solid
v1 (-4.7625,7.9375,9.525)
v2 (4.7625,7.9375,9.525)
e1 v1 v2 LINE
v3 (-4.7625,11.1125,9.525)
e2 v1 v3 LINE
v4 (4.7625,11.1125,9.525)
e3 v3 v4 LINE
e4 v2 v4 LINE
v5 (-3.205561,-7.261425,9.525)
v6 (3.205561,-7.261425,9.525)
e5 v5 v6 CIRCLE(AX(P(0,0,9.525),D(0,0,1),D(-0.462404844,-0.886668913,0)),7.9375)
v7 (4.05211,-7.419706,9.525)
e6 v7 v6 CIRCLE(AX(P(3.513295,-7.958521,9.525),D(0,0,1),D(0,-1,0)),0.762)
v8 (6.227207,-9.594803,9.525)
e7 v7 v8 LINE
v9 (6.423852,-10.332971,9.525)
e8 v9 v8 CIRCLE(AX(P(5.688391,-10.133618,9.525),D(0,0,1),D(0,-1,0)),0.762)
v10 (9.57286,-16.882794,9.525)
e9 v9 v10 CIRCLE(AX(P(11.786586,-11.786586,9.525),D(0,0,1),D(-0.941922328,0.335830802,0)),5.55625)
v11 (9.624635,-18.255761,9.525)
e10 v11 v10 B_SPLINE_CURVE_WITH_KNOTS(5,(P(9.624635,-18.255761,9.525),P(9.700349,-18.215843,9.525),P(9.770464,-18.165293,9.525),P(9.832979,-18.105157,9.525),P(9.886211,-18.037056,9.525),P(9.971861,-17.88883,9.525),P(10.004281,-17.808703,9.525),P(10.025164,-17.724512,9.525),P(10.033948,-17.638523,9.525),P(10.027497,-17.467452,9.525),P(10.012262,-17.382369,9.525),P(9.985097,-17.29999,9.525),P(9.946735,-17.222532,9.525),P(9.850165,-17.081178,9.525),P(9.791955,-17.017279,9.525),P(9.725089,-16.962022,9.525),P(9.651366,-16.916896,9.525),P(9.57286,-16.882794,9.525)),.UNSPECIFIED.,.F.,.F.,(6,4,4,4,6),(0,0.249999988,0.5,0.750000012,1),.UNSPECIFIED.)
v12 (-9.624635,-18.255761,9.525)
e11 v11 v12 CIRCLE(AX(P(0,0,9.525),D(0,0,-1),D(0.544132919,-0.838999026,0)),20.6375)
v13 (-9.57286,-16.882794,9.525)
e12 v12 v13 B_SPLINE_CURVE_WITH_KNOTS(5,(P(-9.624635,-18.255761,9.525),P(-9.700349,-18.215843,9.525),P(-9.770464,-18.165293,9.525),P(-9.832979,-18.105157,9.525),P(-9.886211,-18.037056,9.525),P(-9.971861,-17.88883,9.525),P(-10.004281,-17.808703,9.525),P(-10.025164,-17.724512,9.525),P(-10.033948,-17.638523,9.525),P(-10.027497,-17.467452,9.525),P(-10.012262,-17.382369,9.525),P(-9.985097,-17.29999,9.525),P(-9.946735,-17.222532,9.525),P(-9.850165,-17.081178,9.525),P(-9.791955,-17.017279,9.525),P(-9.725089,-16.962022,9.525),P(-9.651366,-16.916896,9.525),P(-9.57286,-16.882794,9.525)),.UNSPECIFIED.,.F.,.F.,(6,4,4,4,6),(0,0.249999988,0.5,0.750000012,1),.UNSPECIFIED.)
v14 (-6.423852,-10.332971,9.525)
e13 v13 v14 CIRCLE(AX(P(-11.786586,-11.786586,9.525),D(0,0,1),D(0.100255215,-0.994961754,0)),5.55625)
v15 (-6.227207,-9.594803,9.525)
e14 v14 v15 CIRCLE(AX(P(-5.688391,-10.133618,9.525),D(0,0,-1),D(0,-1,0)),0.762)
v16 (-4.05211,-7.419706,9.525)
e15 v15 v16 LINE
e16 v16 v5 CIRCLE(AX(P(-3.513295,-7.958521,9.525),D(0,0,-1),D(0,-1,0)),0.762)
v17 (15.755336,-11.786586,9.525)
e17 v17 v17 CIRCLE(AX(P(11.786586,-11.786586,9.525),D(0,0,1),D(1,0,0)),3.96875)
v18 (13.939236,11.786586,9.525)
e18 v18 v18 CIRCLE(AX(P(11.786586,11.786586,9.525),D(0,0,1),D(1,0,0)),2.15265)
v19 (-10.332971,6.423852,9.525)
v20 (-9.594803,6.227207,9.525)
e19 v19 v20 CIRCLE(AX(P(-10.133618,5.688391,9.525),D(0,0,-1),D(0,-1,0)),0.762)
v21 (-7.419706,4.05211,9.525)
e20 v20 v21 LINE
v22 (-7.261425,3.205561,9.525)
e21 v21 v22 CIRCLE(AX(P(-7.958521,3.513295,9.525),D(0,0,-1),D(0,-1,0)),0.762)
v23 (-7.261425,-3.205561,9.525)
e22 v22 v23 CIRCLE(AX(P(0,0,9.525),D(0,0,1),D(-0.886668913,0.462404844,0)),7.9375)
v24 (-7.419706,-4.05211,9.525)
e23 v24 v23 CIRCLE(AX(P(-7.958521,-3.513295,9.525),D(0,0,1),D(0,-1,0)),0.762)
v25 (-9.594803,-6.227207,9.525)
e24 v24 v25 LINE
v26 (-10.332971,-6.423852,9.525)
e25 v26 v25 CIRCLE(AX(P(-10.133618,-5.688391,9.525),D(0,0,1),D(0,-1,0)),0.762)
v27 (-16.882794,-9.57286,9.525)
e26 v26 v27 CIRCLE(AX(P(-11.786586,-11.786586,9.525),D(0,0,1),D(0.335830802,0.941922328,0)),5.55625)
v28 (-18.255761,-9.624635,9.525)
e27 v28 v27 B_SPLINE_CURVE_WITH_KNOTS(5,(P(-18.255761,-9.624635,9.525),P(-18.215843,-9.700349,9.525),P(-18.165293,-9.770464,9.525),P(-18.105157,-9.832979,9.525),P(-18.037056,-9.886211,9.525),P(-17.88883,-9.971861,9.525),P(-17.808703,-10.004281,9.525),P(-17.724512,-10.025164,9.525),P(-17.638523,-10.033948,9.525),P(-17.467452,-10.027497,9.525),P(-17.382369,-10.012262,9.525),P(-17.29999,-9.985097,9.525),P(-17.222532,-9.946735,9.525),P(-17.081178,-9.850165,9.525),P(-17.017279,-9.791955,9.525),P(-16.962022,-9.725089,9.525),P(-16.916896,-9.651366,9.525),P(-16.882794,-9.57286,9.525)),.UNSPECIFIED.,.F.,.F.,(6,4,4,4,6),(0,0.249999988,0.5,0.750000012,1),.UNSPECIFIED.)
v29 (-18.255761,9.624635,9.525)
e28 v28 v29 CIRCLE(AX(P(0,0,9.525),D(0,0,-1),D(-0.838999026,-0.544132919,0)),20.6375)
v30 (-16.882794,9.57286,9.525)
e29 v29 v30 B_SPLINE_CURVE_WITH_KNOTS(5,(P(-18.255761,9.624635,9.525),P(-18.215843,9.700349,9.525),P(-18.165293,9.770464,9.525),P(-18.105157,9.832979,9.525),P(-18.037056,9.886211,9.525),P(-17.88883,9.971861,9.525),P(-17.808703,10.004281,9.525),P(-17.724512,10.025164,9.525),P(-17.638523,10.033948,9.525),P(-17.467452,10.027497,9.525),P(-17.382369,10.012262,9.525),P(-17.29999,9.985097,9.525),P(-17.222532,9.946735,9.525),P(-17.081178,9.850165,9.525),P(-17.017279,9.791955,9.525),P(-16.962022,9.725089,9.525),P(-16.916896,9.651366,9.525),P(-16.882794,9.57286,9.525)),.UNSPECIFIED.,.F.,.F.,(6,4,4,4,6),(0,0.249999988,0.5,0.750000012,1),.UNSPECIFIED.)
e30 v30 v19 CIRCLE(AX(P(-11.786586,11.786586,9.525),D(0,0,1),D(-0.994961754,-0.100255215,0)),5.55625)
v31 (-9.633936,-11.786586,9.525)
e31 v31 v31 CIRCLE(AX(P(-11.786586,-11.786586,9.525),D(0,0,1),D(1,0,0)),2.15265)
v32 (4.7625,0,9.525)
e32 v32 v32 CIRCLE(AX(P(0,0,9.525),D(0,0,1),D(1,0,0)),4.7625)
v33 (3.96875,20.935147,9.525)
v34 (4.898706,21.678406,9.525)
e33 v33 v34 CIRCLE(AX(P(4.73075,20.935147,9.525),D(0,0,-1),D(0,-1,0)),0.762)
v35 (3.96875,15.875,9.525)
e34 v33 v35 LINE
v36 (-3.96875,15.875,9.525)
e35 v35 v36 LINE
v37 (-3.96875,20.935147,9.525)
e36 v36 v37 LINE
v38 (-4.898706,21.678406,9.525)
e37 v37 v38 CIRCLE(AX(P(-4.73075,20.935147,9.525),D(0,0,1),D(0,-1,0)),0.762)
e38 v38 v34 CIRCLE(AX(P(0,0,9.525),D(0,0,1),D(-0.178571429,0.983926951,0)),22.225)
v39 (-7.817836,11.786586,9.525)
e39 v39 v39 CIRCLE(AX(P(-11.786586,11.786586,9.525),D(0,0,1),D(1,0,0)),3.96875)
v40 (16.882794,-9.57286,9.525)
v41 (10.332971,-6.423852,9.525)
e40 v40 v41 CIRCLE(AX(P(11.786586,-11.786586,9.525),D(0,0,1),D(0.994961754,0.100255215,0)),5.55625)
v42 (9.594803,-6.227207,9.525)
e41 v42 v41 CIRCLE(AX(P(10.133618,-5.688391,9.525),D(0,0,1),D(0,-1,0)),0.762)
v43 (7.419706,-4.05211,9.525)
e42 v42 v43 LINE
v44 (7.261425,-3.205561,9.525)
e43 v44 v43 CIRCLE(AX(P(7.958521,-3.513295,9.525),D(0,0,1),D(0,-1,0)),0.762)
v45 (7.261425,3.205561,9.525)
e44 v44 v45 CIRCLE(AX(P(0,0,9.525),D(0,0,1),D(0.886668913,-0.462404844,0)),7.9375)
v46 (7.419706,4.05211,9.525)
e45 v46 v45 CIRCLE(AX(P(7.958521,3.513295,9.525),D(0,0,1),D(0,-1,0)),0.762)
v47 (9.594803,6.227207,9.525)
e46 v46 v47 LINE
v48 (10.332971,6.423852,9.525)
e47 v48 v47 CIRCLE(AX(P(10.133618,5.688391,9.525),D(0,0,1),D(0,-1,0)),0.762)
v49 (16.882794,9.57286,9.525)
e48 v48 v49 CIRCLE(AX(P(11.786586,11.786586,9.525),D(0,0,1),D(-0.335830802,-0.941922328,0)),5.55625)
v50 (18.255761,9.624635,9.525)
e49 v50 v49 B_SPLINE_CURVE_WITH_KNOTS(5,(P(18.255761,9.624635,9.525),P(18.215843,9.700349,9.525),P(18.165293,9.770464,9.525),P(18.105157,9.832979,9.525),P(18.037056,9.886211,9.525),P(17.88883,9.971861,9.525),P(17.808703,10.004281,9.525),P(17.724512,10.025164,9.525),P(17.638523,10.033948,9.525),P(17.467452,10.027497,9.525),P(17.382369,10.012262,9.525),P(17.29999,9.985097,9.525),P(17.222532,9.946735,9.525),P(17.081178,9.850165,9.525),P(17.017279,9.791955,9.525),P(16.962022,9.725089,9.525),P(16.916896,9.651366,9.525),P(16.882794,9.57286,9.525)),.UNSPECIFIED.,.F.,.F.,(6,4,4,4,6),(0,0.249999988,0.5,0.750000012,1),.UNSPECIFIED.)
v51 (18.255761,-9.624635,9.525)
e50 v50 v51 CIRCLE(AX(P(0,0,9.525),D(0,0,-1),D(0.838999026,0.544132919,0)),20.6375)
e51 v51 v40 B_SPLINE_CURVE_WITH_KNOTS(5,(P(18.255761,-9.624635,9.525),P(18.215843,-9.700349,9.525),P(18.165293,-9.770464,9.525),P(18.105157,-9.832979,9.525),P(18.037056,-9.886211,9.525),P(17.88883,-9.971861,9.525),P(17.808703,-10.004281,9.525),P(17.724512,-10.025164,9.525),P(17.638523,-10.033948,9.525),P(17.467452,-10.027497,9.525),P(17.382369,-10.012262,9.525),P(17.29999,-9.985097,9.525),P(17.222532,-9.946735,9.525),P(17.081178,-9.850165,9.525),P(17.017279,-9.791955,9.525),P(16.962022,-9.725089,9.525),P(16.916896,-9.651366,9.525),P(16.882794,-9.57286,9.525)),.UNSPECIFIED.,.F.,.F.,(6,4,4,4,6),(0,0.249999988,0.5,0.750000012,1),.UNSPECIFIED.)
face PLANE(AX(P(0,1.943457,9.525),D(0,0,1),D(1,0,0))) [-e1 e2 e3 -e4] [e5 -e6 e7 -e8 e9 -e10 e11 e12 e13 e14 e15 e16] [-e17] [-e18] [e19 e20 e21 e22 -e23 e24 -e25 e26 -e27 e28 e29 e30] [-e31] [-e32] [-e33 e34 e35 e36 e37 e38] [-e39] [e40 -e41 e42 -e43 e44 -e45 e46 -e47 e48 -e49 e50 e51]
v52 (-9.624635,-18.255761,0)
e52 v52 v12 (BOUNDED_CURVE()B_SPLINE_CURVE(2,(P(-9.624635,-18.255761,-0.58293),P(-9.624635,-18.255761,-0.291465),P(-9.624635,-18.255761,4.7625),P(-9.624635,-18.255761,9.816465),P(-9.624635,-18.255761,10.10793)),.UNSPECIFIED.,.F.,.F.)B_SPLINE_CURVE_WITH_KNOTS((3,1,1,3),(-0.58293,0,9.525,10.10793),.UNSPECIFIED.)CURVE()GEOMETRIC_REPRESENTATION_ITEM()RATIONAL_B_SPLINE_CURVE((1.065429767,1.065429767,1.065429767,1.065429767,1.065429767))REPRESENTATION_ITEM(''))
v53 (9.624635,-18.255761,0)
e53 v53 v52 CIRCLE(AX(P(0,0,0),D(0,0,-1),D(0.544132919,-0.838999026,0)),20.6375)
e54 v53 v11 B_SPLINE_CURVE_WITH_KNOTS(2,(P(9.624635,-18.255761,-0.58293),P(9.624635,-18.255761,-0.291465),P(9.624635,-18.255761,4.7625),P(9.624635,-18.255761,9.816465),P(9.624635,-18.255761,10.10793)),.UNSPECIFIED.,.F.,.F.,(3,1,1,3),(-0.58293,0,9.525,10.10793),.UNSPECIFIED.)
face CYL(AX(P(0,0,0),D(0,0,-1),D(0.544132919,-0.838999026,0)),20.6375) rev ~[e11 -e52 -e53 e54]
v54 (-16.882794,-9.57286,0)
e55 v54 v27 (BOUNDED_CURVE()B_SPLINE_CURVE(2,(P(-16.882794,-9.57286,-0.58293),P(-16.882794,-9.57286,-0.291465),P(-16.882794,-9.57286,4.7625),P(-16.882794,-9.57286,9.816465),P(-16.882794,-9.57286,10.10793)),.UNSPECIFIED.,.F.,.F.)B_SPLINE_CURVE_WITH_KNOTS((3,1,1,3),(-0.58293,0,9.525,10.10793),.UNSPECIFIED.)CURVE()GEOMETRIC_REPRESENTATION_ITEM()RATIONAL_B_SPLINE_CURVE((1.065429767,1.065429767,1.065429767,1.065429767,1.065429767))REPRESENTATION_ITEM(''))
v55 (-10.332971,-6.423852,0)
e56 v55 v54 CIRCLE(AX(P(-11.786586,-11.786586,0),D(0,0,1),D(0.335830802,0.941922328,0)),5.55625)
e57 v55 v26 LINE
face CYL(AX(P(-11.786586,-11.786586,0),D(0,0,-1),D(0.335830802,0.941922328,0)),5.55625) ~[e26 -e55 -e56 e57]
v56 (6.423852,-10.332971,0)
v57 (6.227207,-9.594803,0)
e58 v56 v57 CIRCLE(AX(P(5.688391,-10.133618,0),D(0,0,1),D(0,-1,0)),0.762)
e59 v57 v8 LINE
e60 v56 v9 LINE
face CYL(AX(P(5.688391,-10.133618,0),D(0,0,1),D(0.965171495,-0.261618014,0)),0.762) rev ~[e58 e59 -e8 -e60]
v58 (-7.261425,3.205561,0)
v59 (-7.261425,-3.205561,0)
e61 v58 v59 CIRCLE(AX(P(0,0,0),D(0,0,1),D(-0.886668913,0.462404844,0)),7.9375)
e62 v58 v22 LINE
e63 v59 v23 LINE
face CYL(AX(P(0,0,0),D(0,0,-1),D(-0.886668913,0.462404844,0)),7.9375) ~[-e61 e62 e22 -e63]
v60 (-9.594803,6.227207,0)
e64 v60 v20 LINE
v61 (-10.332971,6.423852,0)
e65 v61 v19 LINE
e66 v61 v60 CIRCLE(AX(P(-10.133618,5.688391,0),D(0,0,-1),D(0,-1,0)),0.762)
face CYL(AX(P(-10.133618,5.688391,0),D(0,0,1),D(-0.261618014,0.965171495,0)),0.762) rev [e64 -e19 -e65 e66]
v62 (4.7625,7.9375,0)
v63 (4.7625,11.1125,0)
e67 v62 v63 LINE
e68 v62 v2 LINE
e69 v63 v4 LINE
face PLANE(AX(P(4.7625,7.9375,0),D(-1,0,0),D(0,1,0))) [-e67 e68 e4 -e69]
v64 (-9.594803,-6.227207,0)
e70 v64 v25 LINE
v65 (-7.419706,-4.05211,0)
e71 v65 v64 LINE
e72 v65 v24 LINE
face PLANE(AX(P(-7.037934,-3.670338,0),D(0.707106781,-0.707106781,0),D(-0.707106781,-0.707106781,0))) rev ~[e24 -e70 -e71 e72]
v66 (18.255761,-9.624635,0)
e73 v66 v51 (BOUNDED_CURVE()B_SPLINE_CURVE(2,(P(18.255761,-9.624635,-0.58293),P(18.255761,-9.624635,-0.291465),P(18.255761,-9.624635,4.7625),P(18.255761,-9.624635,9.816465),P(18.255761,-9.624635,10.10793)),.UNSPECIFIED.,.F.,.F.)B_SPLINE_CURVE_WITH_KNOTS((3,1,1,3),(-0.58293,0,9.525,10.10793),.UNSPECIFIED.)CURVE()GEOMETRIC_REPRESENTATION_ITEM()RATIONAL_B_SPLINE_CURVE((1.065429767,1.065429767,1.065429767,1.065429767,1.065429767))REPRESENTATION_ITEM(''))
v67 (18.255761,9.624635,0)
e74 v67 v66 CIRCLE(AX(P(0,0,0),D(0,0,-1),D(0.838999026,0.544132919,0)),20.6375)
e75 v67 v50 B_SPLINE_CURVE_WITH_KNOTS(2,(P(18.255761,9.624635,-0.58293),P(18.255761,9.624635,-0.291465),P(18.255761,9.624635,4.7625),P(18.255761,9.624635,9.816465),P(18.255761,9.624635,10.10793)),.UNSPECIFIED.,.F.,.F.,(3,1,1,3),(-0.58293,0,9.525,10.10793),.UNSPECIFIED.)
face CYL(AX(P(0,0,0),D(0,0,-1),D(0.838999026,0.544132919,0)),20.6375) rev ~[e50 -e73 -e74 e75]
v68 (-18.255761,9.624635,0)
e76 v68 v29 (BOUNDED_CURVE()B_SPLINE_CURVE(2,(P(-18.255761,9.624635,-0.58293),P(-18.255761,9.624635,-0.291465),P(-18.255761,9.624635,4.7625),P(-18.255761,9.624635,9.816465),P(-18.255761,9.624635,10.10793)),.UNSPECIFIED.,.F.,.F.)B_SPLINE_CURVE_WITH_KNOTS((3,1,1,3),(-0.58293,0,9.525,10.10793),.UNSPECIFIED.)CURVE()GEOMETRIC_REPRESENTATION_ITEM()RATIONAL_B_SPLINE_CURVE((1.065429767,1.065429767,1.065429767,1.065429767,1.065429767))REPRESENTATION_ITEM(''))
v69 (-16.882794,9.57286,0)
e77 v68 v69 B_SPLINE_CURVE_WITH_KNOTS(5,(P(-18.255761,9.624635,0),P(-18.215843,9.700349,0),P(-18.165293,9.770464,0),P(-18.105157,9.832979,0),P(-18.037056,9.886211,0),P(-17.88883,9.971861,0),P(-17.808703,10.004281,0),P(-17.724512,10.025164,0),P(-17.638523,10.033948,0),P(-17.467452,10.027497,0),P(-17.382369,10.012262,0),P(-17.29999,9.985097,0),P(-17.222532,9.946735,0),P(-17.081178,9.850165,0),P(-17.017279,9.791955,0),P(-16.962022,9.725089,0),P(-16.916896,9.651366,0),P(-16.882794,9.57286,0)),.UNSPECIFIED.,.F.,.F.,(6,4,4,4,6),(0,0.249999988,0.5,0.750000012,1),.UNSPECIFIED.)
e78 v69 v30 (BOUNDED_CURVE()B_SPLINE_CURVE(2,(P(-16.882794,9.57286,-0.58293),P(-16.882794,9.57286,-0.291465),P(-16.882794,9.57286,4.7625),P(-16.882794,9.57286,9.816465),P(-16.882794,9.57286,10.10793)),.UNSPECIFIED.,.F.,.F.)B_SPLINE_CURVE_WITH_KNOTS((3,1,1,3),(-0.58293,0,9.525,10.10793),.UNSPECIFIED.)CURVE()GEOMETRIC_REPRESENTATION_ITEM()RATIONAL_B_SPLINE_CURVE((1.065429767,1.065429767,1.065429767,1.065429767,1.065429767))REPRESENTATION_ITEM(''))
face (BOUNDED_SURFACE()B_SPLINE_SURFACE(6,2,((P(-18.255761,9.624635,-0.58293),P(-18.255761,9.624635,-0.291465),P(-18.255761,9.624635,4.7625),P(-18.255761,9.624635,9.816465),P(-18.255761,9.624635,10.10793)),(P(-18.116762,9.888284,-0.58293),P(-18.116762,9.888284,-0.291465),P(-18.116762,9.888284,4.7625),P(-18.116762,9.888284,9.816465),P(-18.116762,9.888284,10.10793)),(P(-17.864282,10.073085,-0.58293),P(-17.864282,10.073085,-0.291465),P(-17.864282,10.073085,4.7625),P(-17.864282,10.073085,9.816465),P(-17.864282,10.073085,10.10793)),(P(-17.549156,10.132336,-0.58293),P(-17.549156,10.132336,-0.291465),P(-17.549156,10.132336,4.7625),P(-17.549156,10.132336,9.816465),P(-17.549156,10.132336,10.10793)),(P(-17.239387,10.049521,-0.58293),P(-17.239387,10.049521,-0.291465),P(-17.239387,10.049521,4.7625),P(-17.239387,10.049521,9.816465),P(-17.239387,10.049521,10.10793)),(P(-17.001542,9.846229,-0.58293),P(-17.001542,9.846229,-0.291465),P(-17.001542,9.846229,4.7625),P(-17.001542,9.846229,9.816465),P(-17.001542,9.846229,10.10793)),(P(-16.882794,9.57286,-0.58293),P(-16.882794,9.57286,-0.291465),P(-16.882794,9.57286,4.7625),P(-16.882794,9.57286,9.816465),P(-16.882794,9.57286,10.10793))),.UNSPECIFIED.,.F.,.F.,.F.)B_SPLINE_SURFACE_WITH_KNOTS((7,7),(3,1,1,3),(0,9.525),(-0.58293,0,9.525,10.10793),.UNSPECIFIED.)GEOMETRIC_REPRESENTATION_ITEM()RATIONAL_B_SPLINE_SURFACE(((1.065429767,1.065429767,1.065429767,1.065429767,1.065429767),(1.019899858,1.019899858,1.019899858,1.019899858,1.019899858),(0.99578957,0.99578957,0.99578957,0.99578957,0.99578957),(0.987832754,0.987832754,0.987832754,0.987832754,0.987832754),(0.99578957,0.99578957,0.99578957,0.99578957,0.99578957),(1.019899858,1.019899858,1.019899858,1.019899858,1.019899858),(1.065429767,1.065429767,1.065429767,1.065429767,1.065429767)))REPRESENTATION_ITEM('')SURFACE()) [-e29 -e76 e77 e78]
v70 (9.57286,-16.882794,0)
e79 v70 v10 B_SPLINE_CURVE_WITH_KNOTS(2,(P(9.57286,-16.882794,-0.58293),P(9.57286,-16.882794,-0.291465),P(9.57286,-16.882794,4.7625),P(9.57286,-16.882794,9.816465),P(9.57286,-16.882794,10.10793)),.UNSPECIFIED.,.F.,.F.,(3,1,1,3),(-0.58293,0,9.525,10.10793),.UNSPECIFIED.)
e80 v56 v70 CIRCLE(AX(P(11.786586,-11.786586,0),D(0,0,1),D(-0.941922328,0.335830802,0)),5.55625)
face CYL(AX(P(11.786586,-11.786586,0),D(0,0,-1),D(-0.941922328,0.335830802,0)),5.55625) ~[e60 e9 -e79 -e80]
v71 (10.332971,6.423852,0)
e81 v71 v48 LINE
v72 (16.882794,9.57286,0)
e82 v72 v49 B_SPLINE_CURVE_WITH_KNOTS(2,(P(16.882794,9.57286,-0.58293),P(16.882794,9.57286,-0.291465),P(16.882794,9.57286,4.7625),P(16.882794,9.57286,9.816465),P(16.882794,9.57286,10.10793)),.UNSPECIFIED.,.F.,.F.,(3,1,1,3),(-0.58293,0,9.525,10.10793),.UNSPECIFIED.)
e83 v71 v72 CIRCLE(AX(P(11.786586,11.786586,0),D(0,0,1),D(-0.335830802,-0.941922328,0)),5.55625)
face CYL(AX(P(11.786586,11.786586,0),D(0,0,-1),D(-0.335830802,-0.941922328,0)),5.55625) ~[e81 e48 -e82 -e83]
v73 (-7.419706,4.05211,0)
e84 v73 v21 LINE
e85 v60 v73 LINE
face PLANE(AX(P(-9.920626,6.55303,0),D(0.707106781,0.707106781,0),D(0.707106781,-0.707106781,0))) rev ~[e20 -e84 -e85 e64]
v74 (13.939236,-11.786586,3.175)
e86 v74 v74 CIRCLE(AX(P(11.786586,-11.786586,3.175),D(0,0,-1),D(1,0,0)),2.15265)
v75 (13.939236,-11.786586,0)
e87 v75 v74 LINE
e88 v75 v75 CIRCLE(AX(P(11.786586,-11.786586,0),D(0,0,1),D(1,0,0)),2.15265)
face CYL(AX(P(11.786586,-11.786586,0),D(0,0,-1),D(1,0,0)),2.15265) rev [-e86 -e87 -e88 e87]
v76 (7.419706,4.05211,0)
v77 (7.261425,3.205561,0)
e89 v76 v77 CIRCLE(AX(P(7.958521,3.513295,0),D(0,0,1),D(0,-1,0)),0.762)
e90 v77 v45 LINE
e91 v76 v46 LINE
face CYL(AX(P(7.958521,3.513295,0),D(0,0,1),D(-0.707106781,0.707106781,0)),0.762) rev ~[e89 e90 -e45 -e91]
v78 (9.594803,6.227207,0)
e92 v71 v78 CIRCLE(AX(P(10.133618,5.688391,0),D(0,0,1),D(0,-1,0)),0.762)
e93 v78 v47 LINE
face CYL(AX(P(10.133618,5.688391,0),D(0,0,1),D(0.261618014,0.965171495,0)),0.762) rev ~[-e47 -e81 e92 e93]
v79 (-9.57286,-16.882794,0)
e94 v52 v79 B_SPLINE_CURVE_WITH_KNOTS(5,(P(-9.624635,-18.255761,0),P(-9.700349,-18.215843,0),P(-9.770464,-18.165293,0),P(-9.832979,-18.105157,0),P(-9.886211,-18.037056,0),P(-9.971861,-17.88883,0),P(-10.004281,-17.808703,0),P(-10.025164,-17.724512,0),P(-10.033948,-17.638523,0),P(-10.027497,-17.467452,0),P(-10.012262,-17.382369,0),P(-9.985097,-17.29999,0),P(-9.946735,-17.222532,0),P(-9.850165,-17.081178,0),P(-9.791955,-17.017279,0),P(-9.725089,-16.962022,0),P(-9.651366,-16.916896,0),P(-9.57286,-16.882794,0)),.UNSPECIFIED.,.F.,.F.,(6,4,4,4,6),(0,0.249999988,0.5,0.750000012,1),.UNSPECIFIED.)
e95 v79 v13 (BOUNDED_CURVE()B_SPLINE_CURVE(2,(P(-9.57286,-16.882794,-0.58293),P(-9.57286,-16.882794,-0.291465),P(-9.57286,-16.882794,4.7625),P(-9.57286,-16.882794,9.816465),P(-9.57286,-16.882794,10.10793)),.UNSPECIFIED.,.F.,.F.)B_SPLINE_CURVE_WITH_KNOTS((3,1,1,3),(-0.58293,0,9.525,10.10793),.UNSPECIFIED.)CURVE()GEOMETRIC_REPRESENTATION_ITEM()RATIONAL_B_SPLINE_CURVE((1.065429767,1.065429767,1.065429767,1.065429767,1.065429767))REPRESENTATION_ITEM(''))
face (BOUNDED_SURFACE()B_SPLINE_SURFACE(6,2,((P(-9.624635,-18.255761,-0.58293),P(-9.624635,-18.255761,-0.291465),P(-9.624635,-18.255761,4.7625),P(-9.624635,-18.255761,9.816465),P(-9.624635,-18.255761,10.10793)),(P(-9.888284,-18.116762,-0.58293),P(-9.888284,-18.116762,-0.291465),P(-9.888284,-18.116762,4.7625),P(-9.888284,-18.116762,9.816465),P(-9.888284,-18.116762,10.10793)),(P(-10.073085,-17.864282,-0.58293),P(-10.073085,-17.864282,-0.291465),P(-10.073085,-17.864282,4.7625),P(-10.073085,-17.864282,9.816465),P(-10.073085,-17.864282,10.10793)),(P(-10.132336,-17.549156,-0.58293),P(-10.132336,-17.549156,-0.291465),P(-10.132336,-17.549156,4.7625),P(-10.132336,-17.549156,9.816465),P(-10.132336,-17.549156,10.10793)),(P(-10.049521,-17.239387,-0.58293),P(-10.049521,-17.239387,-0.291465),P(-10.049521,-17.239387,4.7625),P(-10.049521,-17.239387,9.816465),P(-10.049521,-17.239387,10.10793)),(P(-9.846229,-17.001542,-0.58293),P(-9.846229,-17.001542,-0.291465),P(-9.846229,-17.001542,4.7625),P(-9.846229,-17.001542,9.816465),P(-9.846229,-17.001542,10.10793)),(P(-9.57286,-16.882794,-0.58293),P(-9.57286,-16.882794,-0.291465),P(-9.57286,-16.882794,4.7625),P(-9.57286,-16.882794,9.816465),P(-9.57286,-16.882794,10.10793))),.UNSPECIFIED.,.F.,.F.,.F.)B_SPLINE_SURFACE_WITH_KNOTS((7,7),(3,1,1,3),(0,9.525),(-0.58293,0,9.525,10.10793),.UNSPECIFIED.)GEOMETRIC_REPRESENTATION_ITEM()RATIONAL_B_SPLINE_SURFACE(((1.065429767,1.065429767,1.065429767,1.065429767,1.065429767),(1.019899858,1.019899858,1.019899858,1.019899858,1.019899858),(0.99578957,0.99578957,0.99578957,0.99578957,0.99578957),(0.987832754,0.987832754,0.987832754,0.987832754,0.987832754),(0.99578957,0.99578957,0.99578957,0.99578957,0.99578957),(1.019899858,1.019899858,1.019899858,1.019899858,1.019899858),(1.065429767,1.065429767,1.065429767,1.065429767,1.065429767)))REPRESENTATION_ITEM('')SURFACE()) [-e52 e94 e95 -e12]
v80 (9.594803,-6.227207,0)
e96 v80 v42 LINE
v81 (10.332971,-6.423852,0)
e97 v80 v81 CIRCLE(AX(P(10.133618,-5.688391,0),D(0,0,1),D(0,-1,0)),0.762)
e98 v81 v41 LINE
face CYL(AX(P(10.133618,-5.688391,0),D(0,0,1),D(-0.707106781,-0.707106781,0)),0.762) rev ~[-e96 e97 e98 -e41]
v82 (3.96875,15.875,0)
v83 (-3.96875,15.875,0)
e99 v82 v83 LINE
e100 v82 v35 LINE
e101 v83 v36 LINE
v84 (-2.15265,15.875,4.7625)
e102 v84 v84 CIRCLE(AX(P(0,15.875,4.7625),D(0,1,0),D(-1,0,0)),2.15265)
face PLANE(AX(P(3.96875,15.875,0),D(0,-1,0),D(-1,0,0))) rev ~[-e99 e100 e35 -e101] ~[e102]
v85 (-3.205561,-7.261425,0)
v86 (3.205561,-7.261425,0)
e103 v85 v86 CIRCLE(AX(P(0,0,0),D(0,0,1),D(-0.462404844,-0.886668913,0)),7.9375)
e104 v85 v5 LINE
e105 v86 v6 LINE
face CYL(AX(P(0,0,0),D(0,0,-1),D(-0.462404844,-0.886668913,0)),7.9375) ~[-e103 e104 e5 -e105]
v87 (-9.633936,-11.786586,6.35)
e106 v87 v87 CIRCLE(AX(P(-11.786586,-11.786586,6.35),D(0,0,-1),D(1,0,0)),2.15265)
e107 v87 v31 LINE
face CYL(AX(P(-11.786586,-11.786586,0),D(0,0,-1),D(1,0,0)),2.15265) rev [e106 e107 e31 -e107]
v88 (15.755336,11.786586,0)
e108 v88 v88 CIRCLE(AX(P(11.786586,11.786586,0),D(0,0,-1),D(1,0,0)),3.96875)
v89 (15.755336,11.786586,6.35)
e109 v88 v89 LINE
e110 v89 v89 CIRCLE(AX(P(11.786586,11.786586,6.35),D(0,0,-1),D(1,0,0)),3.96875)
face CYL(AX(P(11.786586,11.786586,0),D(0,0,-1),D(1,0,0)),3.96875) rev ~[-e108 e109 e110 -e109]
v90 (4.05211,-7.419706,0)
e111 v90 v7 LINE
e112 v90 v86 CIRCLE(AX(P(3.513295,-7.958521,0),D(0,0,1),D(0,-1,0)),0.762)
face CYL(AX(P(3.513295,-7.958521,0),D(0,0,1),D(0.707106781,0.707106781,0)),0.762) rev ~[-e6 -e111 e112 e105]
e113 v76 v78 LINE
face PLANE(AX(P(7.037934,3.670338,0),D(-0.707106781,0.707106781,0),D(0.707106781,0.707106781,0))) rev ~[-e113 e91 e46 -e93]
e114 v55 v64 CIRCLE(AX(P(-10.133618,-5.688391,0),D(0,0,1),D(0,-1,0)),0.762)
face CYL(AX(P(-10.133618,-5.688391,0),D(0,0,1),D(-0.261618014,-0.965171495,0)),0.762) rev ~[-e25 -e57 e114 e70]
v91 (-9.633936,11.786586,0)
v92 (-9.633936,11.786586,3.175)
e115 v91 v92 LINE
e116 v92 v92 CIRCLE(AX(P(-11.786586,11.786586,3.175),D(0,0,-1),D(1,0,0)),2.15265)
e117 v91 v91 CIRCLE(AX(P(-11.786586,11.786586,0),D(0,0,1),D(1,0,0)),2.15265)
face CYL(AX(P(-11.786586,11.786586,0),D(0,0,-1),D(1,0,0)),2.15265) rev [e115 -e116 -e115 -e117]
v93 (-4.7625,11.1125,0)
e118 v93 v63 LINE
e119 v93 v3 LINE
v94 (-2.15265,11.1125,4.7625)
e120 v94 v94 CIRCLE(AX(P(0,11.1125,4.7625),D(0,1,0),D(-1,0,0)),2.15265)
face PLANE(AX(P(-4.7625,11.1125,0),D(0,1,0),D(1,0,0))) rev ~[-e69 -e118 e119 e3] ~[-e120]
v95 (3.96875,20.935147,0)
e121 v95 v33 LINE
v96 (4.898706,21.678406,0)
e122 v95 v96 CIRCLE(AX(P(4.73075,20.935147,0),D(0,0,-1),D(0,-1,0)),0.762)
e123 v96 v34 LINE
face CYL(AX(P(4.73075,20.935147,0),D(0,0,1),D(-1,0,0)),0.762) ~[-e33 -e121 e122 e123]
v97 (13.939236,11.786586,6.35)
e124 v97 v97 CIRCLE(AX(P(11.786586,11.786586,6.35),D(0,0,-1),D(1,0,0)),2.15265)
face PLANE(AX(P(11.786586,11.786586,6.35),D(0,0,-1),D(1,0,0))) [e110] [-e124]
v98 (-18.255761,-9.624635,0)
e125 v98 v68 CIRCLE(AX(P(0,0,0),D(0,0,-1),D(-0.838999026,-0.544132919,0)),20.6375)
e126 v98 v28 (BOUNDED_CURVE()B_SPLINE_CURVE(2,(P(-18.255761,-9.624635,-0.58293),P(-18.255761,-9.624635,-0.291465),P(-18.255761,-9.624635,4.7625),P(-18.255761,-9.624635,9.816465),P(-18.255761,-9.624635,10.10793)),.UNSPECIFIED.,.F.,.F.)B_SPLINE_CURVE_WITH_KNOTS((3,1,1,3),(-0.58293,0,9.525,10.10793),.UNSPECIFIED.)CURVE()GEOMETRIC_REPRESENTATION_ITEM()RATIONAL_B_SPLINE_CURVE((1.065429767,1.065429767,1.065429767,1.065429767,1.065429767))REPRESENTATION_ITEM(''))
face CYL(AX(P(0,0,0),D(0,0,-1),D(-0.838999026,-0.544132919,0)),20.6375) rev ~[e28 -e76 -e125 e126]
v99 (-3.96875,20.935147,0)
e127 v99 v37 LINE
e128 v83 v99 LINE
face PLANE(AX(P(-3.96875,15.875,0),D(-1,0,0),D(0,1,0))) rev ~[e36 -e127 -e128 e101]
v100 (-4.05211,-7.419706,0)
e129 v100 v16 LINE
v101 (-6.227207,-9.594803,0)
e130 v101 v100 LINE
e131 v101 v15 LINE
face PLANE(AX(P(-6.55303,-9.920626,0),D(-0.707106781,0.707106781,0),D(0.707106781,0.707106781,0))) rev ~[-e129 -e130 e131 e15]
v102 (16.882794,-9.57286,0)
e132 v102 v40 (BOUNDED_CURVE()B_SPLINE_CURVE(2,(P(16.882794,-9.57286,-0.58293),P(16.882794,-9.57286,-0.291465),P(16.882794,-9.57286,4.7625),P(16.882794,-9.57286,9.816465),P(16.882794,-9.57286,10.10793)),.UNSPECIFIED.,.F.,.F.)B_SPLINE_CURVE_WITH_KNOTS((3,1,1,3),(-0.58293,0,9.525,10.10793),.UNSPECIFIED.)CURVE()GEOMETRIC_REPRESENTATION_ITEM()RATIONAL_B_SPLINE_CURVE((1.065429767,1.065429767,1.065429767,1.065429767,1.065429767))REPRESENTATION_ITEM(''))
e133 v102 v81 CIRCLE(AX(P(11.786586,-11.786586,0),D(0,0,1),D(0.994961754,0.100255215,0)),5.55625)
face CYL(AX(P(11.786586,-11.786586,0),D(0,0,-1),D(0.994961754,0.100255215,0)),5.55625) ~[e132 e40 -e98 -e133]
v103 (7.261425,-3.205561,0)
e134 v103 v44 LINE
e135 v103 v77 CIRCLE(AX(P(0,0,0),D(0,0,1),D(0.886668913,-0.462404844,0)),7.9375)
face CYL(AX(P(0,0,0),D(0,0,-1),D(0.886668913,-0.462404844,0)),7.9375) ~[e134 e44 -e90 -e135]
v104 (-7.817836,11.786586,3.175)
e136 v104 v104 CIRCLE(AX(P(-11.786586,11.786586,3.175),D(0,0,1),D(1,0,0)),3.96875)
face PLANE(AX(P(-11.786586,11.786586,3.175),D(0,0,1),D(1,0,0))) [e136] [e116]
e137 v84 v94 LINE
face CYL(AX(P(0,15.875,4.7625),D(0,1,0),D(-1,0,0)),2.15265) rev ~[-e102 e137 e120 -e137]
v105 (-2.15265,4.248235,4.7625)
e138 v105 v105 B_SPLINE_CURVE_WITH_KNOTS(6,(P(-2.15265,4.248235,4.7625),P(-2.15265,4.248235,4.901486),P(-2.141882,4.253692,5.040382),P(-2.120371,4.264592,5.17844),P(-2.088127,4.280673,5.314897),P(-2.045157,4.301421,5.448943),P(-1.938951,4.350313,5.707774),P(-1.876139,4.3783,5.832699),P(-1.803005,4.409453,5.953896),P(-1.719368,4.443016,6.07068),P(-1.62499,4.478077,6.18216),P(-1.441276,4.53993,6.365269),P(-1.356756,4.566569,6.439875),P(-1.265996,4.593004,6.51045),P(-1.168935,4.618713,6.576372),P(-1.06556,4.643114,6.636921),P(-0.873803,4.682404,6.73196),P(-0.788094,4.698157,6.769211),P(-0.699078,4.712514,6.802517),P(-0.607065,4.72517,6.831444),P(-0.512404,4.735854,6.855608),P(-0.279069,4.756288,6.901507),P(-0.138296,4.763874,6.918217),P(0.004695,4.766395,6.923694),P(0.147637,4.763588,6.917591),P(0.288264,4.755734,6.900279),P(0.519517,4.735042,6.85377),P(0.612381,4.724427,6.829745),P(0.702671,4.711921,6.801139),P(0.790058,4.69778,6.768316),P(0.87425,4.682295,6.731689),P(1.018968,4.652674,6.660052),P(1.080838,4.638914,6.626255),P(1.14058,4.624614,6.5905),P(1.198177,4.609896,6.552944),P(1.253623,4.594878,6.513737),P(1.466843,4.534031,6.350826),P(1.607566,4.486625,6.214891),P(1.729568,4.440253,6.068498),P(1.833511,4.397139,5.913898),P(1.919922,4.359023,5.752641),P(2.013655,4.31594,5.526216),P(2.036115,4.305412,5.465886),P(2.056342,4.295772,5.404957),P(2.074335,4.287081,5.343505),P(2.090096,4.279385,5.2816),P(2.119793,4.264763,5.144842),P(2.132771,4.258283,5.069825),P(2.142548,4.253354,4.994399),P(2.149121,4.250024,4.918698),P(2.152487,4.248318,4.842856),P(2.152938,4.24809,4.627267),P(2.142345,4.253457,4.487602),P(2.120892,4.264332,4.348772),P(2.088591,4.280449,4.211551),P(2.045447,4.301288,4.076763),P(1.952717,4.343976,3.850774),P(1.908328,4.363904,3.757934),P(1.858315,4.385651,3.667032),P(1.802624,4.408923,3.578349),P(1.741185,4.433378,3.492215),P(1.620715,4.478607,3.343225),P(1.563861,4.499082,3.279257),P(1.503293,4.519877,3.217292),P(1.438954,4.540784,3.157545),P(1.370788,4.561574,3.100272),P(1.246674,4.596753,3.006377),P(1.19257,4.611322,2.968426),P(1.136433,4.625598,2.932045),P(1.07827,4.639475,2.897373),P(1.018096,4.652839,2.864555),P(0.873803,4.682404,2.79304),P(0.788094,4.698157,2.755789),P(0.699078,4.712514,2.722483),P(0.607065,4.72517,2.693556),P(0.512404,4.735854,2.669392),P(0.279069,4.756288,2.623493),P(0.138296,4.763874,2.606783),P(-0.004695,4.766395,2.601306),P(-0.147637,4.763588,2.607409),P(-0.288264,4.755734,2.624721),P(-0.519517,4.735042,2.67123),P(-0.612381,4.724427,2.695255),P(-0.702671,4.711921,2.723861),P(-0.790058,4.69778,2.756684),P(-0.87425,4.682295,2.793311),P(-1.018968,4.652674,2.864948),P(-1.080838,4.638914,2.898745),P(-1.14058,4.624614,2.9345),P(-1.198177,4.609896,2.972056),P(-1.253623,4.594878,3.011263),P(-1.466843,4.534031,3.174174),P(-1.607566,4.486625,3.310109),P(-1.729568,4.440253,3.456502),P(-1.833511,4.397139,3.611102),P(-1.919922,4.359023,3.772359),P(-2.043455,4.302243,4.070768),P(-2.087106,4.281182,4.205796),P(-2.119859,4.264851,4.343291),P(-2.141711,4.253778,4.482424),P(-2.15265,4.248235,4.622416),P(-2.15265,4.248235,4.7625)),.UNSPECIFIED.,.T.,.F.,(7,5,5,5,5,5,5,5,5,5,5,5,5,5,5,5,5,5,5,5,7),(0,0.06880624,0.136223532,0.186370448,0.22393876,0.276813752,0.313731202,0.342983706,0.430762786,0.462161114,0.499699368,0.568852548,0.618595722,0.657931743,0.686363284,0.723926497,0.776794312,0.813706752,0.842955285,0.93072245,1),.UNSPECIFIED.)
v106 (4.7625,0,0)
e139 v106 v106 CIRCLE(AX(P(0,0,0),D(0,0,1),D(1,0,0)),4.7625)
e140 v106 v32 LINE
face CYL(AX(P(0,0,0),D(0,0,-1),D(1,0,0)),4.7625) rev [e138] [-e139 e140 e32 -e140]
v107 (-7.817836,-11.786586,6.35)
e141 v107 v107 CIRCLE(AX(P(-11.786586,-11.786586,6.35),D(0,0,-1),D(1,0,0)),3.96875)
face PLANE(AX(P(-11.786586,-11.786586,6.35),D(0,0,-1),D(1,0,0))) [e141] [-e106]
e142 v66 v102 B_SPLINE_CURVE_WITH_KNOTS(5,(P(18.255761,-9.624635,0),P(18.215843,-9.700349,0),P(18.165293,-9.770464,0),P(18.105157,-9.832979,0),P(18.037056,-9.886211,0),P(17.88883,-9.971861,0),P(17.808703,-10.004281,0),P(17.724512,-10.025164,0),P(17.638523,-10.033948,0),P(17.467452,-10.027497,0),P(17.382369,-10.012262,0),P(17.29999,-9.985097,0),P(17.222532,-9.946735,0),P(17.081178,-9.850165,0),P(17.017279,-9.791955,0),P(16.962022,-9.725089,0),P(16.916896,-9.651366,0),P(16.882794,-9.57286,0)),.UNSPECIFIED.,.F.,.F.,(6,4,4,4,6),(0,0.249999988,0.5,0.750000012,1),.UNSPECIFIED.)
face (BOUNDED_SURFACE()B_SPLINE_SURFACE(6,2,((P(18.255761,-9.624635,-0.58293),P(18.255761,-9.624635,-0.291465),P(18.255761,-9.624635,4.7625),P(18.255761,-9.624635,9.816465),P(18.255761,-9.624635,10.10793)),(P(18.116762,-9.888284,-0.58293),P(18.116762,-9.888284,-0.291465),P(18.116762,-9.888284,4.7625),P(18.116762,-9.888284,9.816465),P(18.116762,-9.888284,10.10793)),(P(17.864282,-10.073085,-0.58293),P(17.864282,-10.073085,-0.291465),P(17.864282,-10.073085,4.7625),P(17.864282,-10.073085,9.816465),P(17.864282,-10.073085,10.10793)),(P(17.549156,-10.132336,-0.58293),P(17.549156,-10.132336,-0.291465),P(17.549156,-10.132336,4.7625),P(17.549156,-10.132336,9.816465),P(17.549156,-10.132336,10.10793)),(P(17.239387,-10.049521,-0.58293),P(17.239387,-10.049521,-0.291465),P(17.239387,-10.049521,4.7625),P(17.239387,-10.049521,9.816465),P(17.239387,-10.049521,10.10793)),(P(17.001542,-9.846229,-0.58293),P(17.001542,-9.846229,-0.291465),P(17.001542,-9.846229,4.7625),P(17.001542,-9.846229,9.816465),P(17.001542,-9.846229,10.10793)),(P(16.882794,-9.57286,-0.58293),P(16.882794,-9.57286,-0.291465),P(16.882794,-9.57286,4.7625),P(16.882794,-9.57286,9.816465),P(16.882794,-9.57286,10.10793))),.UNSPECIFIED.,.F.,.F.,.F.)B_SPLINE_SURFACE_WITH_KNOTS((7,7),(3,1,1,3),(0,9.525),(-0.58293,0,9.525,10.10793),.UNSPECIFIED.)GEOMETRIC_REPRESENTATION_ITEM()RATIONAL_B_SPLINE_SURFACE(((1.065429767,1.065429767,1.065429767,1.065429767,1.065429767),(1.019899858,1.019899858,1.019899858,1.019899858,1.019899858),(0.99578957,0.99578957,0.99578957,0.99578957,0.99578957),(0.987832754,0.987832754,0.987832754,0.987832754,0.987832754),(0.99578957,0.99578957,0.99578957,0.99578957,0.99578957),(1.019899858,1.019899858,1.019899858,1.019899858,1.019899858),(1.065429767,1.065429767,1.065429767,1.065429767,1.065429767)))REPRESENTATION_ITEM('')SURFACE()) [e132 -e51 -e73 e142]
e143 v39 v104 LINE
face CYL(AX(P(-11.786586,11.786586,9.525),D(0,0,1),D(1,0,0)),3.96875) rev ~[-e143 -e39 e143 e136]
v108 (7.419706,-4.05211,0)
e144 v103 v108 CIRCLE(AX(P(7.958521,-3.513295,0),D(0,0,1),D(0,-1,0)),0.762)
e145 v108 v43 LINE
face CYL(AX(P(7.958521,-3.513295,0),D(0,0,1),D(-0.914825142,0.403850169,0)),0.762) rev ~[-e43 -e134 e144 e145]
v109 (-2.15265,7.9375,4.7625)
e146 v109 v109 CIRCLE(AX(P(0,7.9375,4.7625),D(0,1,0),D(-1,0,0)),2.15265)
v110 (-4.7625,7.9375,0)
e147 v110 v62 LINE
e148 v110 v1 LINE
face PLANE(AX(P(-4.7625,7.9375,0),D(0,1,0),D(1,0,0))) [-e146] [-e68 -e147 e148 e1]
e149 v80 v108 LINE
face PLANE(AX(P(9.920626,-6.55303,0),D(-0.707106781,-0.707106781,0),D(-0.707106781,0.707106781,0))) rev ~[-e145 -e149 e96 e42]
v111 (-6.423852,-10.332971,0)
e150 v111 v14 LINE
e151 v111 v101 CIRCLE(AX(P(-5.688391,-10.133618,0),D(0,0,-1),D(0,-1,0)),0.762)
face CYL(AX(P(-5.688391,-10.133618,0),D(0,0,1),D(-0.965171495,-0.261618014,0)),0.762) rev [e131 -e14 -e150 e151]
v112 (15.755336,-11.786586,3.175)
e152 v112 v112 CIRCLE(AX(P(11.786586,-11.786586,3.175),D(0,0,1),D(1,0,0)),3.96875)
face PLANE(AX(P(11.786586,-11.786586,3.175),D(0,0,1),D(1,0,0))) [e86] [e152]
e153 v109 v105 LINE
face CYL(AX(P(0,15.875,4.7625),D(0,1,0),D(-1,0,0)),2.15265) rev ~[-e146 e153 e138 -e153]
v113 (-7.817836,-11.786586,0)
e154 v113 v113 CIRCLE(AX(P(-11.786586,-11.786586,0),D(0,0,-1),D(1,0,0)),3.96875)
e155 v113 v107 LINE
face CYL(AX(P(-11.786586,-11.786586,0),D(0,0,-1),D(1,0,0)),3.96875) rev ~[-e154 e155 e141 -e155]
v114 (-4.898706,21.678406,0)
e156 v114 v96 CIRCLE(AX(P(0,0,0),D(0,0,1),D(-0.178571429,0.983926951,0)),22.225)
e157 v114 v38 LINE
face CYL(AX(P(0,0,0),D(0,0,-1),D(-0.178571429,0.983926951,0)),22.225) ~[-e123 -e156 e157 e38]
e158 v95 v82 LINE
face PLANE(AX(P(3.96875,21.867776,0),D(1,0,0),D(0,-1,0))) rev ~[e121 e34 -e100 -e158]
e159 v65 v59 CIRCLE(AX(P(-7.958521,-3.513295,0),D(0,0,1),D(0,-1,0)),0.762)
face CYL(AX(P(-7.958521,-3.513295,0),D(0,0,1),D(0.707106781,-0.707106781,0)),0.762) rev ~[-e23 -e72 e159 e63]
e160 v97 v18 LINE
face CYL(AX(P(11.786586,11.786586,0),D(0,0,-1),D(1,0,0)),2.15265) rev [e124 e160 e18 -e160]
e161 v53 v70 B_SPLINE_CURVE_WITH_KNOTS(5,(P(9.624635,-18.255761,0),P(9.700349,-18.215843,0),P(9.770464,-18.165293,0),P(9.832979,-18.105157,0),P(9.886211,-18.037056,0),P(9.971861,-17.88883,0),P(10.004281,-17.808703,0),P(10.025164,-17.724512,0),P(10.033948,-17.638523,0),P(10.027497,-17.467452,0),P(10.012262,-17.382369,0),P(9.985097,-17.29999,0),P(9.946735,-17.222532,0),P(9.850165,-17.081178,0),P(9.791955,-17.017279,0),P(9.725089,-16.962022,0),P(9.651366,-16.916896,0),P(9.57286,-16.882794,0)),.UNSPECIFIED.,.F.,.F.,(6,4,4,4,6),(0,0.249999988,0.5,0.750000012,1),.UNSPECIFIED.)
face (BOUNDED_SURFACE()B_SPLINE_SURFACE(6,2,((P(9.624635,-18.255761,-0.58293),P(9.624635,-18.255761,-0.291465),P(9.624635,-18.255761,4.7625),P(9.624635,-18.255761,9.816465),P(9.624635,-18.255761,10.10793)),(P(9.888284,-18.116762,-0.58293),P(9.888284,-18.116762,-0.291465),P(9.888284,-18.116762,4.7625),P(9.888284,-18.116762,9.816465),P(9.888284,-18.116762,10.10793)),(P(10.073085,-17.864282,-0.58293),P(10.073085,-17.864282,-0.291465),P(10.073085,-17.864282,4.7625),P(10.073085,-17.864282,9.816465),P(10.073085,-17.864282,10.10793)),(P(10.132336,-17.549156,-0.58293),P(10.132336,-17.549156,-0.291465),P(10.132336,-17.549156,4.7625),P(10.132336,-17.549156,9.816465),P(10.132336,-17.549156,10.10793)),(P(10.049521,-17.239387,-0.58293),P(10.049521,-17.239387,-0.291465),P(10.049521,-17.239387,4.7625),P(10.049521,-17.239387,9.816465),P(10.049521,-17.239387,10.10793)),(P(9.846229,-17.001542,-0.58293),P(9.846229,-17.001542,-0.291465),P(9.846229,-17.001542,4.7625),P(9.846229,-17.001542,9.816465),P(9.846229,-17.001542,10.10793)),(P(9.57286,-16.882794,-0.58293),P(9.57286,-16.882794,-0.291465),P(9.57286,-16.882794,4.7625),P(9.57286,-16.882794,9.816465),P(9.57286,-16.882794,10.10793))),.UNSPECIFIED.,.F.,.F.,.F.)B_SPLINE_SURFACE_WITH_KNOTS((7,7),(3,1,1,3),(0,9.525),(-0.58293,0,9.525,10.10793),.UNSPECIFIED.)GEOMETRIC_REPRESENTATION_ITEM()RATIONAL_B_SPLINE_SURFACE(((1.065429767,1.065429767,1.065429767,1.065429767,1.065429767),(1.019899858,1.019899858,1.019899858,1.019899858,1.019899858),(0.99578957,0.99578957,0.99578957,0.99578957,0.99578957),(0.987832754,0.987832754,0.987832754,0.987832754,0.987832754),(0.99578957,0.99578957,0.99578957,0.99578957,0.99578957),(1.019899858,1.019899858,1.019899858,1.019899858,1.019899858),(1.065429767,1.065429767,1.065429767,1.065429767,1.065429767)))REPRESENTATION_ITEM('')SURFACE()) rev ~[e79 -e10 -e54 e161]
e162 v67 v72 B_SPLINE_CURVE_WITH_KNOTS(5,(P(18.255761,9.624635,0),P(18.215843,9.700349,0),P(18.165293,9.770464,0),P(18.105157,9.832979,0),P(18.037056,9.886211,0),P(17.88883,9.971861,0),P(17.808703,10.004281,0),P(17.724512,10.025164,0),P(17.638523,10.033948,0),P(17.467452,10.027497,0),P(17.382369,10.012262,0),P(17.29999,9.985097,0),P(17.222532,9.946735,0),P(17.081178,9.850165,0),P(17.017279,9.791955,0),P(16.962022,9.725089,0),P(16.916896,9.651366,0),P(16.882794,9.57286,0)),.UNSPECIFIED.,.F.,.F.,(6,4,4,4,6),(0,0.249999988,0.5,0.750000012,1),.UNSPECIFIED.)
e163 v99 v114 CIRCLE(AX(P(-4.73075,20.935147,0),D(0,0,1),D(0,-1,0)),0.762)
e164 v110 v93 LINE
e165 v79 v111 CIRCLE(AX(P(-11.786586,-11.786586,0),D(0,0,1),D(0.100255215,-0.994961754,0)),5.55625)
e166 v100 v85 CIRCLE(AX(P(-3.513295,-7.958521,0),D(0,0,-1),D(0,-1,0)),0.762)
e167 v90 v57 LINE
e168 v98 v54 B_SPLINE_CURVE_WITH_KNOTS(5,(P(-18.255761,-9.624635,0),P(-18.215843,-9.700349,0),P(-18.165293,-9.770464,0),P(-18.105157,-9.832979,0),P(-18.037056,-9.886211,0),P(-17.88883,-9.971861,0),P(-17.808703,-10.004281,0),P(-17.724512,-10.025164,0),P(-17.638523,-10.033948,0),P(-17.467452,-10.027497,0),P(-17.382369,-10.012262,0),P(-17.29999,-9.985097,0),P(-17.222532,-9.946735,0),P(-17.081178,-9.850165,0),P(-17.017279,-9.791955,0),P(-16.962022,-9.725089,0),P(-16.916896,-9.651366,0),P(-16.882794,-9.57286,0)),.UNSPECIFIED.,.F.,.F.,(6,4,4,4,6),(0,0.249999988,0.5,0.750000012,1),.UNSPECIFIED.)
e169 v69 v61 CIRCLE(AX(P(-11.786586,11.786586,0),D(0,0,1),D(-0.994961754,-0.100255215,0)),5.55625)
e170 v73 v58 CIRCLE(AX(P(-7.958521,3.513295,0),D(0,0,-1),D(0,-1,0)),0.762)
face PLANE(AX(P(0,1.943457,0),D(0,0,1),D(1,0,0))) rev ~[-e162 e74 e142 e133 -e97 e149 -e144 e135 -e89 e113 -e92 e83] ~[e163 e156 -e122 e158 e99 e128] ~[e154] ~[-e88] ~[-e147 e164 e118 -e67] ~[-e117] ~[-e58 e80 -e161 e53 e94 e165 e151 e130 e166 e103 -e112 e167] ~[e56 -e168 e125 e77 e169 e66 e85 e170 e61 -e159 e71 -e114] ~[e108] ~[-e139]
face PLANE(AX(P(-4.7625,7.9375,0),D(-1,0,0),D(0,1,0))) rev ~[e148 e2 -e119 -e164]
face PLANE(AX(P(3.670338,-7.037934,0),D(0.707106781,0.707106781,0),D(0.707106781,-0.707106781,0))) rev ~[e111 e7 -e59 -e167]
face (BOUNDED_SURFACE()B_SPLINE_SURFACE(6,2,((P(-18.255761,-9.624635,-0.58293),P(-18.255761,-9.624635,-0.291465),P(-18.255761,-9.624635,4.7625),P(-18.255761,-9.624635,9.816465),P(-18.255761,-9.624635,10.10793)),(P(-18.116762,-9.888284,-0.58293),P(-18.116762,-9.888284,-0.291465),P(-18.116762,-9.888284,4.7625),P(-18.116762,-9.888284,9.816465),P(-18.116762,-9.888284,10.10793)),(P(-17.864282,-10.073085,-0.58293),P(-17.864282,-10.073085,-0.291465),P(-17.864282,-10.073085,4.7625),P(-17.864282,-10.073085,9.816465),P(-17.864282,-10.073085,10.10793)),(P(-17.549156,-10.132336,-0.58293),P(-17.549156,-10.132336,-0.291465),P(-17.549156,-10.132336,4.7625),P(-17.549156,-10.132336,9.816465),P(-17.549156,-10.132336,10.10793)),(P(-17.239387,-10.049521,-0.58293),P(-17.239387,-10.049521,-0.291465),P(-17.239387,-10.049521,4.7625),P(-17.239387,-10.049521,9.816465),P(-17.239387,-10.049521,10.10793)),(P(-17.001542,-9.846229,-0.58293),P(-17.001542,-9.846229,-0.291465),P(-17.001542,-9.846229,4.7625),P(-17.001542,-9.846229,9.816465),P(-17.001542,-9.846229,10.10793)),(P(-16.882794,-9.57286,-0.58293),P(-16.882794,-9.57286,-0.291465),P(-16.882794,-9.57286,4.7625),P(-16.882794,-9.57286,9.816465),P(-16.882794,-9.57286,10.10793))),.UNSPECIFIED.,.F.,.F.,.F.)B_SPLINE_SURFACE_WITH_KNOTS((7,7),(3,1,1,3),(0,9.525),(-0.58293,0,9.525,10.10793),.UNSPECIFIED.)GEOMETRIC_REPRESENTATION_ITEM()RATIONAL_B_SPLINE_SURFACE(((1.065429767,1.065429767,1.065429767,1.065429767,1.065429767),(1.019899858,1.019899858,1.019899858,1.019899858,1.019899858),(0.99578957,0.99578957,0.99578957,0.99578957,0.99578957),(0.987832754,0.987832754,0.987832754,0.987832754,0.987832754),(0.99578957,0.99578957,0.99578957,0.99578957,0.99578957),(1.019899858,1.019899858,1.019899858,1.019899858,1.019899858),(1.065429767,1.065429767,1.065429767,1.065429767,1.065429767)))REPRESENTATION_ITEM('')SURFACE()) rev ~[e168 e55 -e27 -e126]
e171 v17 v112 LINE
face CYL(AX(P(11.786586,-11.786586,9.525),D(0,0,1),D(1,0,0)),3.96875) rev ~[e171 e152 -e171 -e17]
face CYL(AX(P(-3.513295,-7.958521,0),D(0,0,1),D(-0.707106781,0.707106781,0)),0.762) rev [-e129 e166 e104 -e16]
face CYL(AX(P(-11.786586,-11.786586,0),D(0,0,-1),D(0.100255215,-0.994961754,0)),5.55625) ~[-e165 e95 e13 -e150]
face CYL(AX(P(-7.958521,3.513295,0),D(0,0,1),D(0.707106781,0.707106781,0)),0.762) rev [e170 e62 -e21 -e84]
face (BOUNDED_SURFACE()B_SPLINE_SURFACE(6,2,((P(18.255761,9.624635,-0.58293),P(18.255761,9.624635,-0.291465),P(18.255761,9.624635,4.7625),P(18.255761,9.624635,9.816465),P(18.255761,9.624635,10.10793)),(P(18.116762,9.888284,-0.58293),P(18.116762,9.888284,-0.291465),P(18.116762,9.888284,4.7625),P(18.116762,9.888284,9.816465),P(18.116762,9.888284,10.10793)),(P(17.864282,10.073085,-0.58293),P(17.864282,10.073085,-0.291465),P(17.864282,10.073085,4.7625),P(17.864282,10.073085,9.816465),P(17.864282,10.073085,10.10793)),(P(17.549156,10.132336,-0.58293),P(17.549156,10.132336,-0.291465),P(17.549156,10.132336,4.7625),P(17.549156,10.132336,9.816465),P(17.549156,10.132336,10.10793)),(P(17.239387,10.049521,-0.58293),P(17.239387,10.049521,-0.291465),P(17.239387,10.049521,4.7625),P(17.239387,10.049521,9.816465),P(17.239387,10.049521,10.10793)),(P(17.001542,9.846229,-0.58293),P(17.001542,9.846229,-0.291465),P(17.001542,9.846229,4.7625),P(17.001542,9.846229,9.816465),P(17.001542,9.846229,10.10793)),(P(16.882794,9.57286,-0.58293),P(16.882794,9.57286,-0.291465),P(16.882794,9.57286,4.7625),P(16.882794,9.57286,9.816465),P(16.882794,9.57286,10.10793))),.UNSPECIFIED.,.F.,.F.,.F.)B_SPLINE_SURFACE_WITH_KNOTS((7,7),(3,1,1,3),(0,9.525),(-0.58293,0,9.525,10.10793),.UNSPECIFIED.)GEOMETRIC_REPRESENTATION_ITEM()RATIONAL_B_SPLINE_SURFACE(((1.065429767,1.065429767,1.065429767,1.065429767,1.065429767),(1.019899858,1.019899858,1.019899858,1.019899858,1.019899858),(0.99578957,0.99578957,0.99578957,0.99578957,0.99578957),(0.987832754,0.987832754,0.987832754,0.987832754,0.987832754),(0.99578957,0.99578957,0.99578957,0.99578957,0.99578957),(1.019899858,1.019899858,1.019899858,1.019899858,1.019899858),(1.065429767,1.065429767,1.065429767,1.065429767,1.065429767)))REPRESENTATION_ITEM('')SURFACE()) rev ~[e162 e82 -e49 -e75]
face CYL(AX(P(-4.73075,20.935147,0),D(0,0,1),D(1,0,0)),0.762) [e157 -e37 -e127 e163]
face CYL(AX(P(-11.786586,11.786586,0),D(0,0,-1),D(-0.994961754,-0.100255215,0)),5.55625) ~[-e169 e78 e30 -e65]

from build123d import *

# Parameters (mm, degrees)
F0_R            = 2.15265
F0_R_2          = 4.7625
F0_W            = 9.525
F0_H            = 3.175
F1_DEPTH        = 9.525
F2_R            = 2.15265
F3_REACH        = 44.1896136501
F6_R            = 3.96875
F7_DEPTH        = 6.35
F9_DEPTH        = 9.525
F9_COPIES_COUNT = 3
F9_COPIES_ANGLE = 180
F10_R           = 0.762
F12_R           = 3.96875
F13_DEPTH       = 6.35


# Not quite as in the source:
# - a feature of the source that left no trace in its solid (it failed there, or was rolled back) is left out
# - a pattern or mirror of a feature is missing from the dataset's text; its kind, count and spacing are read off the source's solid


with BuildPart() as f1:
    # F0 (on Top) → F1 (new body)
    with BuildSketch(Plane.XY):
        with BuildLine():
            Line((3.96875, 15.875), (-3.96875, 15.875))
            Line((-3.96875, 15.875), (-3.96875, 21.8677764859))
            ThreePointArc((-3.96875, 21.8677764859), (0, -22.225), (3.96875, 21.8677764859))
            Line((3.96875, 21.8677764859), (3.96875, 15.875))
        make_face()
        with Locations((-11.7865861589, -11.7865861589)):
            Circle(F0_R, mode=Mode.SUBTRACT)
        with Locations((11.7865861589, -11.7865861589)):
            Circle(F0_R, mode=Mode.SUBTRACT)
        with Locations((-11.7865861589, 11.7865861589)):
            Circle(F0_R, mode=Mode.SUBTRACT)
        Circle(F0_R_2, mode=Mode.SUBTRACT)
        with Locations((0, 9.525)):
            Rectangle(F0_W, F0_H, mode=Mode.SUBTRACT)
        with Locations((11.7865861589, 11.7865861589)):
            Circle(F0_R, mode=Mode.SUBTRACT)
    extrude(amount=F1_DEPTH)

    f3_end = f1.faces().sort_by_distance((-4.7625, 0, 4.7625))[0]
    # F2 (on face) → F3 (cut, up to a face of the model that its end follows)
    with BuildSketch(Plane(origin=(0, 15.875, 0), x_dir=(-1, 0, 0), z_dir=(0, 1, 0))):
        with Locations((0, 4.7625)):
            Circle(F2_R)
    f3_long = extrude(amount=-F3_REACH, mode=Mode.PRIVATE)
    add(split(f3_long, bisect_by=f3_end, keep=Keep.ALL, mode=Mode.PRIVATE).solids().sort_by_distance((0, 15.875, 4.7625))[0], mode=Mode.SUBTRACT)

    # F6 (on face) → F7 (cut, through all)
    with BuildSketch(Plane(origin=(0, 0, 0), x_dir=(1, 0, 0), z_dir=(0, 0, -1))):
        with Locations((11.7865861589, -11.7865861589)):
            Circle(F6_R)
        with Locations((-11.7865861589, 11.7865861589)):
            Circle(F6_R)
    extrude(amount=-F7_DEPTH, mode=Mode.SUBTRACT)

    # F8 (on face) → F9 (cut, through all)
    with BuildSketch(Plane(origin=(0, 0, 0), x_dir=(1, 0, 0), z_dir=(0, 0, -1))):
        with BuildLine():
            ThreePointArc((-17.3148424047, -11.229543123), (-14.7565267097, -7.0906978311), (-9.9206262673, -6.5530302219))
            Line((-9.9206262673, -6.5530302219), (-7.0379344931, -3.6703384477))
            ThreePointArc((-7.0379344931, -3.6703384477), (-7.9375, 0), (-7.0379344931, 3.6703384477))
            Line((-7.0379344931, 3.6703384477), (-9.9206262673, 6.5530302219))
            ThreePointArc((-9.9206262673, 6.5530302219), (-14.7565267097, 7.0906978311), (-17.3148424047, 11.229543123))
            ThreePointArc((-17.3148424047, 11.229543123), (-20.6375, 0), (-17.3148424047, -11.229543123))
        make_face()
    f9 = extrude(amount=-F9_DEPTH, mode=Mode.SUBTRACT)

    # F9_copies: F9 ×3 about axis
    f9_copies_axis = Axis((0, 0, 0), (0, 0, 1))
    for i in range(1, F9_COPIES_COUNT):
        add(f9.rotate(f9_copies_axis, i * F9_COPIES_ANGLE / (F9_COPIES_COUNT - 1)), mode=Mode.SUBTRACT)

    # F10
    f10_edges = [f1.edges().sort_by_distance(p)[0] for p in [
        (-17.314842, -11.229543, 4.7625),
        (-9.920626, -6.55303, 4.7625),
        (-7.037934, -3.670338, 4.7625),
        (-7.037934, 3.670338, 4.7625),
        (-9.920626, 6.55303, 4.7625),
        (-17.314842, 11.229543, 4.7625),
        (3.96875, 21.867776, 4.7625),
        (-3.96875, 21.867776, 4.7625),
        (11.229543, -17.314842, 4.7625),
        (-11.229543, -17.314842, 4.7625),
        (6.55303, -9.920626, 4.7625),
        (-6.55303, -9.920626, 4.7625),
        (3.670338, -7.037934, 4.7625),
        (-3.670338, -7.037934, 4.7625),
        (17.314842, 11.229543, 4.7625),
        (17.314842, -11.229543, 4.7625),
        (9.920626, 6.55303, 4.7625),
        (7.037934, 3.670338, 4.7625),
        (7.037934, -3.670338, 4.7625),
        (9.920626, -6.55303, 4.7625),
    ]]
    fillet(f10_edges, radius=F10_R)

    # F12 (on face) → F13 (cut, through all)
    with BuildSketch(Plane.XY.offset(9.525)):
        with Locations((11.7865861589, -11.7865861589)):
            Circle(F12_R)
        with Locations((-11.7865861589, 11.7865861589)):
            Circle(F12_R)
    extrude(amount=-F13_DEPTH, mode=Mode.SUBTRACT)


solid = f1.part
